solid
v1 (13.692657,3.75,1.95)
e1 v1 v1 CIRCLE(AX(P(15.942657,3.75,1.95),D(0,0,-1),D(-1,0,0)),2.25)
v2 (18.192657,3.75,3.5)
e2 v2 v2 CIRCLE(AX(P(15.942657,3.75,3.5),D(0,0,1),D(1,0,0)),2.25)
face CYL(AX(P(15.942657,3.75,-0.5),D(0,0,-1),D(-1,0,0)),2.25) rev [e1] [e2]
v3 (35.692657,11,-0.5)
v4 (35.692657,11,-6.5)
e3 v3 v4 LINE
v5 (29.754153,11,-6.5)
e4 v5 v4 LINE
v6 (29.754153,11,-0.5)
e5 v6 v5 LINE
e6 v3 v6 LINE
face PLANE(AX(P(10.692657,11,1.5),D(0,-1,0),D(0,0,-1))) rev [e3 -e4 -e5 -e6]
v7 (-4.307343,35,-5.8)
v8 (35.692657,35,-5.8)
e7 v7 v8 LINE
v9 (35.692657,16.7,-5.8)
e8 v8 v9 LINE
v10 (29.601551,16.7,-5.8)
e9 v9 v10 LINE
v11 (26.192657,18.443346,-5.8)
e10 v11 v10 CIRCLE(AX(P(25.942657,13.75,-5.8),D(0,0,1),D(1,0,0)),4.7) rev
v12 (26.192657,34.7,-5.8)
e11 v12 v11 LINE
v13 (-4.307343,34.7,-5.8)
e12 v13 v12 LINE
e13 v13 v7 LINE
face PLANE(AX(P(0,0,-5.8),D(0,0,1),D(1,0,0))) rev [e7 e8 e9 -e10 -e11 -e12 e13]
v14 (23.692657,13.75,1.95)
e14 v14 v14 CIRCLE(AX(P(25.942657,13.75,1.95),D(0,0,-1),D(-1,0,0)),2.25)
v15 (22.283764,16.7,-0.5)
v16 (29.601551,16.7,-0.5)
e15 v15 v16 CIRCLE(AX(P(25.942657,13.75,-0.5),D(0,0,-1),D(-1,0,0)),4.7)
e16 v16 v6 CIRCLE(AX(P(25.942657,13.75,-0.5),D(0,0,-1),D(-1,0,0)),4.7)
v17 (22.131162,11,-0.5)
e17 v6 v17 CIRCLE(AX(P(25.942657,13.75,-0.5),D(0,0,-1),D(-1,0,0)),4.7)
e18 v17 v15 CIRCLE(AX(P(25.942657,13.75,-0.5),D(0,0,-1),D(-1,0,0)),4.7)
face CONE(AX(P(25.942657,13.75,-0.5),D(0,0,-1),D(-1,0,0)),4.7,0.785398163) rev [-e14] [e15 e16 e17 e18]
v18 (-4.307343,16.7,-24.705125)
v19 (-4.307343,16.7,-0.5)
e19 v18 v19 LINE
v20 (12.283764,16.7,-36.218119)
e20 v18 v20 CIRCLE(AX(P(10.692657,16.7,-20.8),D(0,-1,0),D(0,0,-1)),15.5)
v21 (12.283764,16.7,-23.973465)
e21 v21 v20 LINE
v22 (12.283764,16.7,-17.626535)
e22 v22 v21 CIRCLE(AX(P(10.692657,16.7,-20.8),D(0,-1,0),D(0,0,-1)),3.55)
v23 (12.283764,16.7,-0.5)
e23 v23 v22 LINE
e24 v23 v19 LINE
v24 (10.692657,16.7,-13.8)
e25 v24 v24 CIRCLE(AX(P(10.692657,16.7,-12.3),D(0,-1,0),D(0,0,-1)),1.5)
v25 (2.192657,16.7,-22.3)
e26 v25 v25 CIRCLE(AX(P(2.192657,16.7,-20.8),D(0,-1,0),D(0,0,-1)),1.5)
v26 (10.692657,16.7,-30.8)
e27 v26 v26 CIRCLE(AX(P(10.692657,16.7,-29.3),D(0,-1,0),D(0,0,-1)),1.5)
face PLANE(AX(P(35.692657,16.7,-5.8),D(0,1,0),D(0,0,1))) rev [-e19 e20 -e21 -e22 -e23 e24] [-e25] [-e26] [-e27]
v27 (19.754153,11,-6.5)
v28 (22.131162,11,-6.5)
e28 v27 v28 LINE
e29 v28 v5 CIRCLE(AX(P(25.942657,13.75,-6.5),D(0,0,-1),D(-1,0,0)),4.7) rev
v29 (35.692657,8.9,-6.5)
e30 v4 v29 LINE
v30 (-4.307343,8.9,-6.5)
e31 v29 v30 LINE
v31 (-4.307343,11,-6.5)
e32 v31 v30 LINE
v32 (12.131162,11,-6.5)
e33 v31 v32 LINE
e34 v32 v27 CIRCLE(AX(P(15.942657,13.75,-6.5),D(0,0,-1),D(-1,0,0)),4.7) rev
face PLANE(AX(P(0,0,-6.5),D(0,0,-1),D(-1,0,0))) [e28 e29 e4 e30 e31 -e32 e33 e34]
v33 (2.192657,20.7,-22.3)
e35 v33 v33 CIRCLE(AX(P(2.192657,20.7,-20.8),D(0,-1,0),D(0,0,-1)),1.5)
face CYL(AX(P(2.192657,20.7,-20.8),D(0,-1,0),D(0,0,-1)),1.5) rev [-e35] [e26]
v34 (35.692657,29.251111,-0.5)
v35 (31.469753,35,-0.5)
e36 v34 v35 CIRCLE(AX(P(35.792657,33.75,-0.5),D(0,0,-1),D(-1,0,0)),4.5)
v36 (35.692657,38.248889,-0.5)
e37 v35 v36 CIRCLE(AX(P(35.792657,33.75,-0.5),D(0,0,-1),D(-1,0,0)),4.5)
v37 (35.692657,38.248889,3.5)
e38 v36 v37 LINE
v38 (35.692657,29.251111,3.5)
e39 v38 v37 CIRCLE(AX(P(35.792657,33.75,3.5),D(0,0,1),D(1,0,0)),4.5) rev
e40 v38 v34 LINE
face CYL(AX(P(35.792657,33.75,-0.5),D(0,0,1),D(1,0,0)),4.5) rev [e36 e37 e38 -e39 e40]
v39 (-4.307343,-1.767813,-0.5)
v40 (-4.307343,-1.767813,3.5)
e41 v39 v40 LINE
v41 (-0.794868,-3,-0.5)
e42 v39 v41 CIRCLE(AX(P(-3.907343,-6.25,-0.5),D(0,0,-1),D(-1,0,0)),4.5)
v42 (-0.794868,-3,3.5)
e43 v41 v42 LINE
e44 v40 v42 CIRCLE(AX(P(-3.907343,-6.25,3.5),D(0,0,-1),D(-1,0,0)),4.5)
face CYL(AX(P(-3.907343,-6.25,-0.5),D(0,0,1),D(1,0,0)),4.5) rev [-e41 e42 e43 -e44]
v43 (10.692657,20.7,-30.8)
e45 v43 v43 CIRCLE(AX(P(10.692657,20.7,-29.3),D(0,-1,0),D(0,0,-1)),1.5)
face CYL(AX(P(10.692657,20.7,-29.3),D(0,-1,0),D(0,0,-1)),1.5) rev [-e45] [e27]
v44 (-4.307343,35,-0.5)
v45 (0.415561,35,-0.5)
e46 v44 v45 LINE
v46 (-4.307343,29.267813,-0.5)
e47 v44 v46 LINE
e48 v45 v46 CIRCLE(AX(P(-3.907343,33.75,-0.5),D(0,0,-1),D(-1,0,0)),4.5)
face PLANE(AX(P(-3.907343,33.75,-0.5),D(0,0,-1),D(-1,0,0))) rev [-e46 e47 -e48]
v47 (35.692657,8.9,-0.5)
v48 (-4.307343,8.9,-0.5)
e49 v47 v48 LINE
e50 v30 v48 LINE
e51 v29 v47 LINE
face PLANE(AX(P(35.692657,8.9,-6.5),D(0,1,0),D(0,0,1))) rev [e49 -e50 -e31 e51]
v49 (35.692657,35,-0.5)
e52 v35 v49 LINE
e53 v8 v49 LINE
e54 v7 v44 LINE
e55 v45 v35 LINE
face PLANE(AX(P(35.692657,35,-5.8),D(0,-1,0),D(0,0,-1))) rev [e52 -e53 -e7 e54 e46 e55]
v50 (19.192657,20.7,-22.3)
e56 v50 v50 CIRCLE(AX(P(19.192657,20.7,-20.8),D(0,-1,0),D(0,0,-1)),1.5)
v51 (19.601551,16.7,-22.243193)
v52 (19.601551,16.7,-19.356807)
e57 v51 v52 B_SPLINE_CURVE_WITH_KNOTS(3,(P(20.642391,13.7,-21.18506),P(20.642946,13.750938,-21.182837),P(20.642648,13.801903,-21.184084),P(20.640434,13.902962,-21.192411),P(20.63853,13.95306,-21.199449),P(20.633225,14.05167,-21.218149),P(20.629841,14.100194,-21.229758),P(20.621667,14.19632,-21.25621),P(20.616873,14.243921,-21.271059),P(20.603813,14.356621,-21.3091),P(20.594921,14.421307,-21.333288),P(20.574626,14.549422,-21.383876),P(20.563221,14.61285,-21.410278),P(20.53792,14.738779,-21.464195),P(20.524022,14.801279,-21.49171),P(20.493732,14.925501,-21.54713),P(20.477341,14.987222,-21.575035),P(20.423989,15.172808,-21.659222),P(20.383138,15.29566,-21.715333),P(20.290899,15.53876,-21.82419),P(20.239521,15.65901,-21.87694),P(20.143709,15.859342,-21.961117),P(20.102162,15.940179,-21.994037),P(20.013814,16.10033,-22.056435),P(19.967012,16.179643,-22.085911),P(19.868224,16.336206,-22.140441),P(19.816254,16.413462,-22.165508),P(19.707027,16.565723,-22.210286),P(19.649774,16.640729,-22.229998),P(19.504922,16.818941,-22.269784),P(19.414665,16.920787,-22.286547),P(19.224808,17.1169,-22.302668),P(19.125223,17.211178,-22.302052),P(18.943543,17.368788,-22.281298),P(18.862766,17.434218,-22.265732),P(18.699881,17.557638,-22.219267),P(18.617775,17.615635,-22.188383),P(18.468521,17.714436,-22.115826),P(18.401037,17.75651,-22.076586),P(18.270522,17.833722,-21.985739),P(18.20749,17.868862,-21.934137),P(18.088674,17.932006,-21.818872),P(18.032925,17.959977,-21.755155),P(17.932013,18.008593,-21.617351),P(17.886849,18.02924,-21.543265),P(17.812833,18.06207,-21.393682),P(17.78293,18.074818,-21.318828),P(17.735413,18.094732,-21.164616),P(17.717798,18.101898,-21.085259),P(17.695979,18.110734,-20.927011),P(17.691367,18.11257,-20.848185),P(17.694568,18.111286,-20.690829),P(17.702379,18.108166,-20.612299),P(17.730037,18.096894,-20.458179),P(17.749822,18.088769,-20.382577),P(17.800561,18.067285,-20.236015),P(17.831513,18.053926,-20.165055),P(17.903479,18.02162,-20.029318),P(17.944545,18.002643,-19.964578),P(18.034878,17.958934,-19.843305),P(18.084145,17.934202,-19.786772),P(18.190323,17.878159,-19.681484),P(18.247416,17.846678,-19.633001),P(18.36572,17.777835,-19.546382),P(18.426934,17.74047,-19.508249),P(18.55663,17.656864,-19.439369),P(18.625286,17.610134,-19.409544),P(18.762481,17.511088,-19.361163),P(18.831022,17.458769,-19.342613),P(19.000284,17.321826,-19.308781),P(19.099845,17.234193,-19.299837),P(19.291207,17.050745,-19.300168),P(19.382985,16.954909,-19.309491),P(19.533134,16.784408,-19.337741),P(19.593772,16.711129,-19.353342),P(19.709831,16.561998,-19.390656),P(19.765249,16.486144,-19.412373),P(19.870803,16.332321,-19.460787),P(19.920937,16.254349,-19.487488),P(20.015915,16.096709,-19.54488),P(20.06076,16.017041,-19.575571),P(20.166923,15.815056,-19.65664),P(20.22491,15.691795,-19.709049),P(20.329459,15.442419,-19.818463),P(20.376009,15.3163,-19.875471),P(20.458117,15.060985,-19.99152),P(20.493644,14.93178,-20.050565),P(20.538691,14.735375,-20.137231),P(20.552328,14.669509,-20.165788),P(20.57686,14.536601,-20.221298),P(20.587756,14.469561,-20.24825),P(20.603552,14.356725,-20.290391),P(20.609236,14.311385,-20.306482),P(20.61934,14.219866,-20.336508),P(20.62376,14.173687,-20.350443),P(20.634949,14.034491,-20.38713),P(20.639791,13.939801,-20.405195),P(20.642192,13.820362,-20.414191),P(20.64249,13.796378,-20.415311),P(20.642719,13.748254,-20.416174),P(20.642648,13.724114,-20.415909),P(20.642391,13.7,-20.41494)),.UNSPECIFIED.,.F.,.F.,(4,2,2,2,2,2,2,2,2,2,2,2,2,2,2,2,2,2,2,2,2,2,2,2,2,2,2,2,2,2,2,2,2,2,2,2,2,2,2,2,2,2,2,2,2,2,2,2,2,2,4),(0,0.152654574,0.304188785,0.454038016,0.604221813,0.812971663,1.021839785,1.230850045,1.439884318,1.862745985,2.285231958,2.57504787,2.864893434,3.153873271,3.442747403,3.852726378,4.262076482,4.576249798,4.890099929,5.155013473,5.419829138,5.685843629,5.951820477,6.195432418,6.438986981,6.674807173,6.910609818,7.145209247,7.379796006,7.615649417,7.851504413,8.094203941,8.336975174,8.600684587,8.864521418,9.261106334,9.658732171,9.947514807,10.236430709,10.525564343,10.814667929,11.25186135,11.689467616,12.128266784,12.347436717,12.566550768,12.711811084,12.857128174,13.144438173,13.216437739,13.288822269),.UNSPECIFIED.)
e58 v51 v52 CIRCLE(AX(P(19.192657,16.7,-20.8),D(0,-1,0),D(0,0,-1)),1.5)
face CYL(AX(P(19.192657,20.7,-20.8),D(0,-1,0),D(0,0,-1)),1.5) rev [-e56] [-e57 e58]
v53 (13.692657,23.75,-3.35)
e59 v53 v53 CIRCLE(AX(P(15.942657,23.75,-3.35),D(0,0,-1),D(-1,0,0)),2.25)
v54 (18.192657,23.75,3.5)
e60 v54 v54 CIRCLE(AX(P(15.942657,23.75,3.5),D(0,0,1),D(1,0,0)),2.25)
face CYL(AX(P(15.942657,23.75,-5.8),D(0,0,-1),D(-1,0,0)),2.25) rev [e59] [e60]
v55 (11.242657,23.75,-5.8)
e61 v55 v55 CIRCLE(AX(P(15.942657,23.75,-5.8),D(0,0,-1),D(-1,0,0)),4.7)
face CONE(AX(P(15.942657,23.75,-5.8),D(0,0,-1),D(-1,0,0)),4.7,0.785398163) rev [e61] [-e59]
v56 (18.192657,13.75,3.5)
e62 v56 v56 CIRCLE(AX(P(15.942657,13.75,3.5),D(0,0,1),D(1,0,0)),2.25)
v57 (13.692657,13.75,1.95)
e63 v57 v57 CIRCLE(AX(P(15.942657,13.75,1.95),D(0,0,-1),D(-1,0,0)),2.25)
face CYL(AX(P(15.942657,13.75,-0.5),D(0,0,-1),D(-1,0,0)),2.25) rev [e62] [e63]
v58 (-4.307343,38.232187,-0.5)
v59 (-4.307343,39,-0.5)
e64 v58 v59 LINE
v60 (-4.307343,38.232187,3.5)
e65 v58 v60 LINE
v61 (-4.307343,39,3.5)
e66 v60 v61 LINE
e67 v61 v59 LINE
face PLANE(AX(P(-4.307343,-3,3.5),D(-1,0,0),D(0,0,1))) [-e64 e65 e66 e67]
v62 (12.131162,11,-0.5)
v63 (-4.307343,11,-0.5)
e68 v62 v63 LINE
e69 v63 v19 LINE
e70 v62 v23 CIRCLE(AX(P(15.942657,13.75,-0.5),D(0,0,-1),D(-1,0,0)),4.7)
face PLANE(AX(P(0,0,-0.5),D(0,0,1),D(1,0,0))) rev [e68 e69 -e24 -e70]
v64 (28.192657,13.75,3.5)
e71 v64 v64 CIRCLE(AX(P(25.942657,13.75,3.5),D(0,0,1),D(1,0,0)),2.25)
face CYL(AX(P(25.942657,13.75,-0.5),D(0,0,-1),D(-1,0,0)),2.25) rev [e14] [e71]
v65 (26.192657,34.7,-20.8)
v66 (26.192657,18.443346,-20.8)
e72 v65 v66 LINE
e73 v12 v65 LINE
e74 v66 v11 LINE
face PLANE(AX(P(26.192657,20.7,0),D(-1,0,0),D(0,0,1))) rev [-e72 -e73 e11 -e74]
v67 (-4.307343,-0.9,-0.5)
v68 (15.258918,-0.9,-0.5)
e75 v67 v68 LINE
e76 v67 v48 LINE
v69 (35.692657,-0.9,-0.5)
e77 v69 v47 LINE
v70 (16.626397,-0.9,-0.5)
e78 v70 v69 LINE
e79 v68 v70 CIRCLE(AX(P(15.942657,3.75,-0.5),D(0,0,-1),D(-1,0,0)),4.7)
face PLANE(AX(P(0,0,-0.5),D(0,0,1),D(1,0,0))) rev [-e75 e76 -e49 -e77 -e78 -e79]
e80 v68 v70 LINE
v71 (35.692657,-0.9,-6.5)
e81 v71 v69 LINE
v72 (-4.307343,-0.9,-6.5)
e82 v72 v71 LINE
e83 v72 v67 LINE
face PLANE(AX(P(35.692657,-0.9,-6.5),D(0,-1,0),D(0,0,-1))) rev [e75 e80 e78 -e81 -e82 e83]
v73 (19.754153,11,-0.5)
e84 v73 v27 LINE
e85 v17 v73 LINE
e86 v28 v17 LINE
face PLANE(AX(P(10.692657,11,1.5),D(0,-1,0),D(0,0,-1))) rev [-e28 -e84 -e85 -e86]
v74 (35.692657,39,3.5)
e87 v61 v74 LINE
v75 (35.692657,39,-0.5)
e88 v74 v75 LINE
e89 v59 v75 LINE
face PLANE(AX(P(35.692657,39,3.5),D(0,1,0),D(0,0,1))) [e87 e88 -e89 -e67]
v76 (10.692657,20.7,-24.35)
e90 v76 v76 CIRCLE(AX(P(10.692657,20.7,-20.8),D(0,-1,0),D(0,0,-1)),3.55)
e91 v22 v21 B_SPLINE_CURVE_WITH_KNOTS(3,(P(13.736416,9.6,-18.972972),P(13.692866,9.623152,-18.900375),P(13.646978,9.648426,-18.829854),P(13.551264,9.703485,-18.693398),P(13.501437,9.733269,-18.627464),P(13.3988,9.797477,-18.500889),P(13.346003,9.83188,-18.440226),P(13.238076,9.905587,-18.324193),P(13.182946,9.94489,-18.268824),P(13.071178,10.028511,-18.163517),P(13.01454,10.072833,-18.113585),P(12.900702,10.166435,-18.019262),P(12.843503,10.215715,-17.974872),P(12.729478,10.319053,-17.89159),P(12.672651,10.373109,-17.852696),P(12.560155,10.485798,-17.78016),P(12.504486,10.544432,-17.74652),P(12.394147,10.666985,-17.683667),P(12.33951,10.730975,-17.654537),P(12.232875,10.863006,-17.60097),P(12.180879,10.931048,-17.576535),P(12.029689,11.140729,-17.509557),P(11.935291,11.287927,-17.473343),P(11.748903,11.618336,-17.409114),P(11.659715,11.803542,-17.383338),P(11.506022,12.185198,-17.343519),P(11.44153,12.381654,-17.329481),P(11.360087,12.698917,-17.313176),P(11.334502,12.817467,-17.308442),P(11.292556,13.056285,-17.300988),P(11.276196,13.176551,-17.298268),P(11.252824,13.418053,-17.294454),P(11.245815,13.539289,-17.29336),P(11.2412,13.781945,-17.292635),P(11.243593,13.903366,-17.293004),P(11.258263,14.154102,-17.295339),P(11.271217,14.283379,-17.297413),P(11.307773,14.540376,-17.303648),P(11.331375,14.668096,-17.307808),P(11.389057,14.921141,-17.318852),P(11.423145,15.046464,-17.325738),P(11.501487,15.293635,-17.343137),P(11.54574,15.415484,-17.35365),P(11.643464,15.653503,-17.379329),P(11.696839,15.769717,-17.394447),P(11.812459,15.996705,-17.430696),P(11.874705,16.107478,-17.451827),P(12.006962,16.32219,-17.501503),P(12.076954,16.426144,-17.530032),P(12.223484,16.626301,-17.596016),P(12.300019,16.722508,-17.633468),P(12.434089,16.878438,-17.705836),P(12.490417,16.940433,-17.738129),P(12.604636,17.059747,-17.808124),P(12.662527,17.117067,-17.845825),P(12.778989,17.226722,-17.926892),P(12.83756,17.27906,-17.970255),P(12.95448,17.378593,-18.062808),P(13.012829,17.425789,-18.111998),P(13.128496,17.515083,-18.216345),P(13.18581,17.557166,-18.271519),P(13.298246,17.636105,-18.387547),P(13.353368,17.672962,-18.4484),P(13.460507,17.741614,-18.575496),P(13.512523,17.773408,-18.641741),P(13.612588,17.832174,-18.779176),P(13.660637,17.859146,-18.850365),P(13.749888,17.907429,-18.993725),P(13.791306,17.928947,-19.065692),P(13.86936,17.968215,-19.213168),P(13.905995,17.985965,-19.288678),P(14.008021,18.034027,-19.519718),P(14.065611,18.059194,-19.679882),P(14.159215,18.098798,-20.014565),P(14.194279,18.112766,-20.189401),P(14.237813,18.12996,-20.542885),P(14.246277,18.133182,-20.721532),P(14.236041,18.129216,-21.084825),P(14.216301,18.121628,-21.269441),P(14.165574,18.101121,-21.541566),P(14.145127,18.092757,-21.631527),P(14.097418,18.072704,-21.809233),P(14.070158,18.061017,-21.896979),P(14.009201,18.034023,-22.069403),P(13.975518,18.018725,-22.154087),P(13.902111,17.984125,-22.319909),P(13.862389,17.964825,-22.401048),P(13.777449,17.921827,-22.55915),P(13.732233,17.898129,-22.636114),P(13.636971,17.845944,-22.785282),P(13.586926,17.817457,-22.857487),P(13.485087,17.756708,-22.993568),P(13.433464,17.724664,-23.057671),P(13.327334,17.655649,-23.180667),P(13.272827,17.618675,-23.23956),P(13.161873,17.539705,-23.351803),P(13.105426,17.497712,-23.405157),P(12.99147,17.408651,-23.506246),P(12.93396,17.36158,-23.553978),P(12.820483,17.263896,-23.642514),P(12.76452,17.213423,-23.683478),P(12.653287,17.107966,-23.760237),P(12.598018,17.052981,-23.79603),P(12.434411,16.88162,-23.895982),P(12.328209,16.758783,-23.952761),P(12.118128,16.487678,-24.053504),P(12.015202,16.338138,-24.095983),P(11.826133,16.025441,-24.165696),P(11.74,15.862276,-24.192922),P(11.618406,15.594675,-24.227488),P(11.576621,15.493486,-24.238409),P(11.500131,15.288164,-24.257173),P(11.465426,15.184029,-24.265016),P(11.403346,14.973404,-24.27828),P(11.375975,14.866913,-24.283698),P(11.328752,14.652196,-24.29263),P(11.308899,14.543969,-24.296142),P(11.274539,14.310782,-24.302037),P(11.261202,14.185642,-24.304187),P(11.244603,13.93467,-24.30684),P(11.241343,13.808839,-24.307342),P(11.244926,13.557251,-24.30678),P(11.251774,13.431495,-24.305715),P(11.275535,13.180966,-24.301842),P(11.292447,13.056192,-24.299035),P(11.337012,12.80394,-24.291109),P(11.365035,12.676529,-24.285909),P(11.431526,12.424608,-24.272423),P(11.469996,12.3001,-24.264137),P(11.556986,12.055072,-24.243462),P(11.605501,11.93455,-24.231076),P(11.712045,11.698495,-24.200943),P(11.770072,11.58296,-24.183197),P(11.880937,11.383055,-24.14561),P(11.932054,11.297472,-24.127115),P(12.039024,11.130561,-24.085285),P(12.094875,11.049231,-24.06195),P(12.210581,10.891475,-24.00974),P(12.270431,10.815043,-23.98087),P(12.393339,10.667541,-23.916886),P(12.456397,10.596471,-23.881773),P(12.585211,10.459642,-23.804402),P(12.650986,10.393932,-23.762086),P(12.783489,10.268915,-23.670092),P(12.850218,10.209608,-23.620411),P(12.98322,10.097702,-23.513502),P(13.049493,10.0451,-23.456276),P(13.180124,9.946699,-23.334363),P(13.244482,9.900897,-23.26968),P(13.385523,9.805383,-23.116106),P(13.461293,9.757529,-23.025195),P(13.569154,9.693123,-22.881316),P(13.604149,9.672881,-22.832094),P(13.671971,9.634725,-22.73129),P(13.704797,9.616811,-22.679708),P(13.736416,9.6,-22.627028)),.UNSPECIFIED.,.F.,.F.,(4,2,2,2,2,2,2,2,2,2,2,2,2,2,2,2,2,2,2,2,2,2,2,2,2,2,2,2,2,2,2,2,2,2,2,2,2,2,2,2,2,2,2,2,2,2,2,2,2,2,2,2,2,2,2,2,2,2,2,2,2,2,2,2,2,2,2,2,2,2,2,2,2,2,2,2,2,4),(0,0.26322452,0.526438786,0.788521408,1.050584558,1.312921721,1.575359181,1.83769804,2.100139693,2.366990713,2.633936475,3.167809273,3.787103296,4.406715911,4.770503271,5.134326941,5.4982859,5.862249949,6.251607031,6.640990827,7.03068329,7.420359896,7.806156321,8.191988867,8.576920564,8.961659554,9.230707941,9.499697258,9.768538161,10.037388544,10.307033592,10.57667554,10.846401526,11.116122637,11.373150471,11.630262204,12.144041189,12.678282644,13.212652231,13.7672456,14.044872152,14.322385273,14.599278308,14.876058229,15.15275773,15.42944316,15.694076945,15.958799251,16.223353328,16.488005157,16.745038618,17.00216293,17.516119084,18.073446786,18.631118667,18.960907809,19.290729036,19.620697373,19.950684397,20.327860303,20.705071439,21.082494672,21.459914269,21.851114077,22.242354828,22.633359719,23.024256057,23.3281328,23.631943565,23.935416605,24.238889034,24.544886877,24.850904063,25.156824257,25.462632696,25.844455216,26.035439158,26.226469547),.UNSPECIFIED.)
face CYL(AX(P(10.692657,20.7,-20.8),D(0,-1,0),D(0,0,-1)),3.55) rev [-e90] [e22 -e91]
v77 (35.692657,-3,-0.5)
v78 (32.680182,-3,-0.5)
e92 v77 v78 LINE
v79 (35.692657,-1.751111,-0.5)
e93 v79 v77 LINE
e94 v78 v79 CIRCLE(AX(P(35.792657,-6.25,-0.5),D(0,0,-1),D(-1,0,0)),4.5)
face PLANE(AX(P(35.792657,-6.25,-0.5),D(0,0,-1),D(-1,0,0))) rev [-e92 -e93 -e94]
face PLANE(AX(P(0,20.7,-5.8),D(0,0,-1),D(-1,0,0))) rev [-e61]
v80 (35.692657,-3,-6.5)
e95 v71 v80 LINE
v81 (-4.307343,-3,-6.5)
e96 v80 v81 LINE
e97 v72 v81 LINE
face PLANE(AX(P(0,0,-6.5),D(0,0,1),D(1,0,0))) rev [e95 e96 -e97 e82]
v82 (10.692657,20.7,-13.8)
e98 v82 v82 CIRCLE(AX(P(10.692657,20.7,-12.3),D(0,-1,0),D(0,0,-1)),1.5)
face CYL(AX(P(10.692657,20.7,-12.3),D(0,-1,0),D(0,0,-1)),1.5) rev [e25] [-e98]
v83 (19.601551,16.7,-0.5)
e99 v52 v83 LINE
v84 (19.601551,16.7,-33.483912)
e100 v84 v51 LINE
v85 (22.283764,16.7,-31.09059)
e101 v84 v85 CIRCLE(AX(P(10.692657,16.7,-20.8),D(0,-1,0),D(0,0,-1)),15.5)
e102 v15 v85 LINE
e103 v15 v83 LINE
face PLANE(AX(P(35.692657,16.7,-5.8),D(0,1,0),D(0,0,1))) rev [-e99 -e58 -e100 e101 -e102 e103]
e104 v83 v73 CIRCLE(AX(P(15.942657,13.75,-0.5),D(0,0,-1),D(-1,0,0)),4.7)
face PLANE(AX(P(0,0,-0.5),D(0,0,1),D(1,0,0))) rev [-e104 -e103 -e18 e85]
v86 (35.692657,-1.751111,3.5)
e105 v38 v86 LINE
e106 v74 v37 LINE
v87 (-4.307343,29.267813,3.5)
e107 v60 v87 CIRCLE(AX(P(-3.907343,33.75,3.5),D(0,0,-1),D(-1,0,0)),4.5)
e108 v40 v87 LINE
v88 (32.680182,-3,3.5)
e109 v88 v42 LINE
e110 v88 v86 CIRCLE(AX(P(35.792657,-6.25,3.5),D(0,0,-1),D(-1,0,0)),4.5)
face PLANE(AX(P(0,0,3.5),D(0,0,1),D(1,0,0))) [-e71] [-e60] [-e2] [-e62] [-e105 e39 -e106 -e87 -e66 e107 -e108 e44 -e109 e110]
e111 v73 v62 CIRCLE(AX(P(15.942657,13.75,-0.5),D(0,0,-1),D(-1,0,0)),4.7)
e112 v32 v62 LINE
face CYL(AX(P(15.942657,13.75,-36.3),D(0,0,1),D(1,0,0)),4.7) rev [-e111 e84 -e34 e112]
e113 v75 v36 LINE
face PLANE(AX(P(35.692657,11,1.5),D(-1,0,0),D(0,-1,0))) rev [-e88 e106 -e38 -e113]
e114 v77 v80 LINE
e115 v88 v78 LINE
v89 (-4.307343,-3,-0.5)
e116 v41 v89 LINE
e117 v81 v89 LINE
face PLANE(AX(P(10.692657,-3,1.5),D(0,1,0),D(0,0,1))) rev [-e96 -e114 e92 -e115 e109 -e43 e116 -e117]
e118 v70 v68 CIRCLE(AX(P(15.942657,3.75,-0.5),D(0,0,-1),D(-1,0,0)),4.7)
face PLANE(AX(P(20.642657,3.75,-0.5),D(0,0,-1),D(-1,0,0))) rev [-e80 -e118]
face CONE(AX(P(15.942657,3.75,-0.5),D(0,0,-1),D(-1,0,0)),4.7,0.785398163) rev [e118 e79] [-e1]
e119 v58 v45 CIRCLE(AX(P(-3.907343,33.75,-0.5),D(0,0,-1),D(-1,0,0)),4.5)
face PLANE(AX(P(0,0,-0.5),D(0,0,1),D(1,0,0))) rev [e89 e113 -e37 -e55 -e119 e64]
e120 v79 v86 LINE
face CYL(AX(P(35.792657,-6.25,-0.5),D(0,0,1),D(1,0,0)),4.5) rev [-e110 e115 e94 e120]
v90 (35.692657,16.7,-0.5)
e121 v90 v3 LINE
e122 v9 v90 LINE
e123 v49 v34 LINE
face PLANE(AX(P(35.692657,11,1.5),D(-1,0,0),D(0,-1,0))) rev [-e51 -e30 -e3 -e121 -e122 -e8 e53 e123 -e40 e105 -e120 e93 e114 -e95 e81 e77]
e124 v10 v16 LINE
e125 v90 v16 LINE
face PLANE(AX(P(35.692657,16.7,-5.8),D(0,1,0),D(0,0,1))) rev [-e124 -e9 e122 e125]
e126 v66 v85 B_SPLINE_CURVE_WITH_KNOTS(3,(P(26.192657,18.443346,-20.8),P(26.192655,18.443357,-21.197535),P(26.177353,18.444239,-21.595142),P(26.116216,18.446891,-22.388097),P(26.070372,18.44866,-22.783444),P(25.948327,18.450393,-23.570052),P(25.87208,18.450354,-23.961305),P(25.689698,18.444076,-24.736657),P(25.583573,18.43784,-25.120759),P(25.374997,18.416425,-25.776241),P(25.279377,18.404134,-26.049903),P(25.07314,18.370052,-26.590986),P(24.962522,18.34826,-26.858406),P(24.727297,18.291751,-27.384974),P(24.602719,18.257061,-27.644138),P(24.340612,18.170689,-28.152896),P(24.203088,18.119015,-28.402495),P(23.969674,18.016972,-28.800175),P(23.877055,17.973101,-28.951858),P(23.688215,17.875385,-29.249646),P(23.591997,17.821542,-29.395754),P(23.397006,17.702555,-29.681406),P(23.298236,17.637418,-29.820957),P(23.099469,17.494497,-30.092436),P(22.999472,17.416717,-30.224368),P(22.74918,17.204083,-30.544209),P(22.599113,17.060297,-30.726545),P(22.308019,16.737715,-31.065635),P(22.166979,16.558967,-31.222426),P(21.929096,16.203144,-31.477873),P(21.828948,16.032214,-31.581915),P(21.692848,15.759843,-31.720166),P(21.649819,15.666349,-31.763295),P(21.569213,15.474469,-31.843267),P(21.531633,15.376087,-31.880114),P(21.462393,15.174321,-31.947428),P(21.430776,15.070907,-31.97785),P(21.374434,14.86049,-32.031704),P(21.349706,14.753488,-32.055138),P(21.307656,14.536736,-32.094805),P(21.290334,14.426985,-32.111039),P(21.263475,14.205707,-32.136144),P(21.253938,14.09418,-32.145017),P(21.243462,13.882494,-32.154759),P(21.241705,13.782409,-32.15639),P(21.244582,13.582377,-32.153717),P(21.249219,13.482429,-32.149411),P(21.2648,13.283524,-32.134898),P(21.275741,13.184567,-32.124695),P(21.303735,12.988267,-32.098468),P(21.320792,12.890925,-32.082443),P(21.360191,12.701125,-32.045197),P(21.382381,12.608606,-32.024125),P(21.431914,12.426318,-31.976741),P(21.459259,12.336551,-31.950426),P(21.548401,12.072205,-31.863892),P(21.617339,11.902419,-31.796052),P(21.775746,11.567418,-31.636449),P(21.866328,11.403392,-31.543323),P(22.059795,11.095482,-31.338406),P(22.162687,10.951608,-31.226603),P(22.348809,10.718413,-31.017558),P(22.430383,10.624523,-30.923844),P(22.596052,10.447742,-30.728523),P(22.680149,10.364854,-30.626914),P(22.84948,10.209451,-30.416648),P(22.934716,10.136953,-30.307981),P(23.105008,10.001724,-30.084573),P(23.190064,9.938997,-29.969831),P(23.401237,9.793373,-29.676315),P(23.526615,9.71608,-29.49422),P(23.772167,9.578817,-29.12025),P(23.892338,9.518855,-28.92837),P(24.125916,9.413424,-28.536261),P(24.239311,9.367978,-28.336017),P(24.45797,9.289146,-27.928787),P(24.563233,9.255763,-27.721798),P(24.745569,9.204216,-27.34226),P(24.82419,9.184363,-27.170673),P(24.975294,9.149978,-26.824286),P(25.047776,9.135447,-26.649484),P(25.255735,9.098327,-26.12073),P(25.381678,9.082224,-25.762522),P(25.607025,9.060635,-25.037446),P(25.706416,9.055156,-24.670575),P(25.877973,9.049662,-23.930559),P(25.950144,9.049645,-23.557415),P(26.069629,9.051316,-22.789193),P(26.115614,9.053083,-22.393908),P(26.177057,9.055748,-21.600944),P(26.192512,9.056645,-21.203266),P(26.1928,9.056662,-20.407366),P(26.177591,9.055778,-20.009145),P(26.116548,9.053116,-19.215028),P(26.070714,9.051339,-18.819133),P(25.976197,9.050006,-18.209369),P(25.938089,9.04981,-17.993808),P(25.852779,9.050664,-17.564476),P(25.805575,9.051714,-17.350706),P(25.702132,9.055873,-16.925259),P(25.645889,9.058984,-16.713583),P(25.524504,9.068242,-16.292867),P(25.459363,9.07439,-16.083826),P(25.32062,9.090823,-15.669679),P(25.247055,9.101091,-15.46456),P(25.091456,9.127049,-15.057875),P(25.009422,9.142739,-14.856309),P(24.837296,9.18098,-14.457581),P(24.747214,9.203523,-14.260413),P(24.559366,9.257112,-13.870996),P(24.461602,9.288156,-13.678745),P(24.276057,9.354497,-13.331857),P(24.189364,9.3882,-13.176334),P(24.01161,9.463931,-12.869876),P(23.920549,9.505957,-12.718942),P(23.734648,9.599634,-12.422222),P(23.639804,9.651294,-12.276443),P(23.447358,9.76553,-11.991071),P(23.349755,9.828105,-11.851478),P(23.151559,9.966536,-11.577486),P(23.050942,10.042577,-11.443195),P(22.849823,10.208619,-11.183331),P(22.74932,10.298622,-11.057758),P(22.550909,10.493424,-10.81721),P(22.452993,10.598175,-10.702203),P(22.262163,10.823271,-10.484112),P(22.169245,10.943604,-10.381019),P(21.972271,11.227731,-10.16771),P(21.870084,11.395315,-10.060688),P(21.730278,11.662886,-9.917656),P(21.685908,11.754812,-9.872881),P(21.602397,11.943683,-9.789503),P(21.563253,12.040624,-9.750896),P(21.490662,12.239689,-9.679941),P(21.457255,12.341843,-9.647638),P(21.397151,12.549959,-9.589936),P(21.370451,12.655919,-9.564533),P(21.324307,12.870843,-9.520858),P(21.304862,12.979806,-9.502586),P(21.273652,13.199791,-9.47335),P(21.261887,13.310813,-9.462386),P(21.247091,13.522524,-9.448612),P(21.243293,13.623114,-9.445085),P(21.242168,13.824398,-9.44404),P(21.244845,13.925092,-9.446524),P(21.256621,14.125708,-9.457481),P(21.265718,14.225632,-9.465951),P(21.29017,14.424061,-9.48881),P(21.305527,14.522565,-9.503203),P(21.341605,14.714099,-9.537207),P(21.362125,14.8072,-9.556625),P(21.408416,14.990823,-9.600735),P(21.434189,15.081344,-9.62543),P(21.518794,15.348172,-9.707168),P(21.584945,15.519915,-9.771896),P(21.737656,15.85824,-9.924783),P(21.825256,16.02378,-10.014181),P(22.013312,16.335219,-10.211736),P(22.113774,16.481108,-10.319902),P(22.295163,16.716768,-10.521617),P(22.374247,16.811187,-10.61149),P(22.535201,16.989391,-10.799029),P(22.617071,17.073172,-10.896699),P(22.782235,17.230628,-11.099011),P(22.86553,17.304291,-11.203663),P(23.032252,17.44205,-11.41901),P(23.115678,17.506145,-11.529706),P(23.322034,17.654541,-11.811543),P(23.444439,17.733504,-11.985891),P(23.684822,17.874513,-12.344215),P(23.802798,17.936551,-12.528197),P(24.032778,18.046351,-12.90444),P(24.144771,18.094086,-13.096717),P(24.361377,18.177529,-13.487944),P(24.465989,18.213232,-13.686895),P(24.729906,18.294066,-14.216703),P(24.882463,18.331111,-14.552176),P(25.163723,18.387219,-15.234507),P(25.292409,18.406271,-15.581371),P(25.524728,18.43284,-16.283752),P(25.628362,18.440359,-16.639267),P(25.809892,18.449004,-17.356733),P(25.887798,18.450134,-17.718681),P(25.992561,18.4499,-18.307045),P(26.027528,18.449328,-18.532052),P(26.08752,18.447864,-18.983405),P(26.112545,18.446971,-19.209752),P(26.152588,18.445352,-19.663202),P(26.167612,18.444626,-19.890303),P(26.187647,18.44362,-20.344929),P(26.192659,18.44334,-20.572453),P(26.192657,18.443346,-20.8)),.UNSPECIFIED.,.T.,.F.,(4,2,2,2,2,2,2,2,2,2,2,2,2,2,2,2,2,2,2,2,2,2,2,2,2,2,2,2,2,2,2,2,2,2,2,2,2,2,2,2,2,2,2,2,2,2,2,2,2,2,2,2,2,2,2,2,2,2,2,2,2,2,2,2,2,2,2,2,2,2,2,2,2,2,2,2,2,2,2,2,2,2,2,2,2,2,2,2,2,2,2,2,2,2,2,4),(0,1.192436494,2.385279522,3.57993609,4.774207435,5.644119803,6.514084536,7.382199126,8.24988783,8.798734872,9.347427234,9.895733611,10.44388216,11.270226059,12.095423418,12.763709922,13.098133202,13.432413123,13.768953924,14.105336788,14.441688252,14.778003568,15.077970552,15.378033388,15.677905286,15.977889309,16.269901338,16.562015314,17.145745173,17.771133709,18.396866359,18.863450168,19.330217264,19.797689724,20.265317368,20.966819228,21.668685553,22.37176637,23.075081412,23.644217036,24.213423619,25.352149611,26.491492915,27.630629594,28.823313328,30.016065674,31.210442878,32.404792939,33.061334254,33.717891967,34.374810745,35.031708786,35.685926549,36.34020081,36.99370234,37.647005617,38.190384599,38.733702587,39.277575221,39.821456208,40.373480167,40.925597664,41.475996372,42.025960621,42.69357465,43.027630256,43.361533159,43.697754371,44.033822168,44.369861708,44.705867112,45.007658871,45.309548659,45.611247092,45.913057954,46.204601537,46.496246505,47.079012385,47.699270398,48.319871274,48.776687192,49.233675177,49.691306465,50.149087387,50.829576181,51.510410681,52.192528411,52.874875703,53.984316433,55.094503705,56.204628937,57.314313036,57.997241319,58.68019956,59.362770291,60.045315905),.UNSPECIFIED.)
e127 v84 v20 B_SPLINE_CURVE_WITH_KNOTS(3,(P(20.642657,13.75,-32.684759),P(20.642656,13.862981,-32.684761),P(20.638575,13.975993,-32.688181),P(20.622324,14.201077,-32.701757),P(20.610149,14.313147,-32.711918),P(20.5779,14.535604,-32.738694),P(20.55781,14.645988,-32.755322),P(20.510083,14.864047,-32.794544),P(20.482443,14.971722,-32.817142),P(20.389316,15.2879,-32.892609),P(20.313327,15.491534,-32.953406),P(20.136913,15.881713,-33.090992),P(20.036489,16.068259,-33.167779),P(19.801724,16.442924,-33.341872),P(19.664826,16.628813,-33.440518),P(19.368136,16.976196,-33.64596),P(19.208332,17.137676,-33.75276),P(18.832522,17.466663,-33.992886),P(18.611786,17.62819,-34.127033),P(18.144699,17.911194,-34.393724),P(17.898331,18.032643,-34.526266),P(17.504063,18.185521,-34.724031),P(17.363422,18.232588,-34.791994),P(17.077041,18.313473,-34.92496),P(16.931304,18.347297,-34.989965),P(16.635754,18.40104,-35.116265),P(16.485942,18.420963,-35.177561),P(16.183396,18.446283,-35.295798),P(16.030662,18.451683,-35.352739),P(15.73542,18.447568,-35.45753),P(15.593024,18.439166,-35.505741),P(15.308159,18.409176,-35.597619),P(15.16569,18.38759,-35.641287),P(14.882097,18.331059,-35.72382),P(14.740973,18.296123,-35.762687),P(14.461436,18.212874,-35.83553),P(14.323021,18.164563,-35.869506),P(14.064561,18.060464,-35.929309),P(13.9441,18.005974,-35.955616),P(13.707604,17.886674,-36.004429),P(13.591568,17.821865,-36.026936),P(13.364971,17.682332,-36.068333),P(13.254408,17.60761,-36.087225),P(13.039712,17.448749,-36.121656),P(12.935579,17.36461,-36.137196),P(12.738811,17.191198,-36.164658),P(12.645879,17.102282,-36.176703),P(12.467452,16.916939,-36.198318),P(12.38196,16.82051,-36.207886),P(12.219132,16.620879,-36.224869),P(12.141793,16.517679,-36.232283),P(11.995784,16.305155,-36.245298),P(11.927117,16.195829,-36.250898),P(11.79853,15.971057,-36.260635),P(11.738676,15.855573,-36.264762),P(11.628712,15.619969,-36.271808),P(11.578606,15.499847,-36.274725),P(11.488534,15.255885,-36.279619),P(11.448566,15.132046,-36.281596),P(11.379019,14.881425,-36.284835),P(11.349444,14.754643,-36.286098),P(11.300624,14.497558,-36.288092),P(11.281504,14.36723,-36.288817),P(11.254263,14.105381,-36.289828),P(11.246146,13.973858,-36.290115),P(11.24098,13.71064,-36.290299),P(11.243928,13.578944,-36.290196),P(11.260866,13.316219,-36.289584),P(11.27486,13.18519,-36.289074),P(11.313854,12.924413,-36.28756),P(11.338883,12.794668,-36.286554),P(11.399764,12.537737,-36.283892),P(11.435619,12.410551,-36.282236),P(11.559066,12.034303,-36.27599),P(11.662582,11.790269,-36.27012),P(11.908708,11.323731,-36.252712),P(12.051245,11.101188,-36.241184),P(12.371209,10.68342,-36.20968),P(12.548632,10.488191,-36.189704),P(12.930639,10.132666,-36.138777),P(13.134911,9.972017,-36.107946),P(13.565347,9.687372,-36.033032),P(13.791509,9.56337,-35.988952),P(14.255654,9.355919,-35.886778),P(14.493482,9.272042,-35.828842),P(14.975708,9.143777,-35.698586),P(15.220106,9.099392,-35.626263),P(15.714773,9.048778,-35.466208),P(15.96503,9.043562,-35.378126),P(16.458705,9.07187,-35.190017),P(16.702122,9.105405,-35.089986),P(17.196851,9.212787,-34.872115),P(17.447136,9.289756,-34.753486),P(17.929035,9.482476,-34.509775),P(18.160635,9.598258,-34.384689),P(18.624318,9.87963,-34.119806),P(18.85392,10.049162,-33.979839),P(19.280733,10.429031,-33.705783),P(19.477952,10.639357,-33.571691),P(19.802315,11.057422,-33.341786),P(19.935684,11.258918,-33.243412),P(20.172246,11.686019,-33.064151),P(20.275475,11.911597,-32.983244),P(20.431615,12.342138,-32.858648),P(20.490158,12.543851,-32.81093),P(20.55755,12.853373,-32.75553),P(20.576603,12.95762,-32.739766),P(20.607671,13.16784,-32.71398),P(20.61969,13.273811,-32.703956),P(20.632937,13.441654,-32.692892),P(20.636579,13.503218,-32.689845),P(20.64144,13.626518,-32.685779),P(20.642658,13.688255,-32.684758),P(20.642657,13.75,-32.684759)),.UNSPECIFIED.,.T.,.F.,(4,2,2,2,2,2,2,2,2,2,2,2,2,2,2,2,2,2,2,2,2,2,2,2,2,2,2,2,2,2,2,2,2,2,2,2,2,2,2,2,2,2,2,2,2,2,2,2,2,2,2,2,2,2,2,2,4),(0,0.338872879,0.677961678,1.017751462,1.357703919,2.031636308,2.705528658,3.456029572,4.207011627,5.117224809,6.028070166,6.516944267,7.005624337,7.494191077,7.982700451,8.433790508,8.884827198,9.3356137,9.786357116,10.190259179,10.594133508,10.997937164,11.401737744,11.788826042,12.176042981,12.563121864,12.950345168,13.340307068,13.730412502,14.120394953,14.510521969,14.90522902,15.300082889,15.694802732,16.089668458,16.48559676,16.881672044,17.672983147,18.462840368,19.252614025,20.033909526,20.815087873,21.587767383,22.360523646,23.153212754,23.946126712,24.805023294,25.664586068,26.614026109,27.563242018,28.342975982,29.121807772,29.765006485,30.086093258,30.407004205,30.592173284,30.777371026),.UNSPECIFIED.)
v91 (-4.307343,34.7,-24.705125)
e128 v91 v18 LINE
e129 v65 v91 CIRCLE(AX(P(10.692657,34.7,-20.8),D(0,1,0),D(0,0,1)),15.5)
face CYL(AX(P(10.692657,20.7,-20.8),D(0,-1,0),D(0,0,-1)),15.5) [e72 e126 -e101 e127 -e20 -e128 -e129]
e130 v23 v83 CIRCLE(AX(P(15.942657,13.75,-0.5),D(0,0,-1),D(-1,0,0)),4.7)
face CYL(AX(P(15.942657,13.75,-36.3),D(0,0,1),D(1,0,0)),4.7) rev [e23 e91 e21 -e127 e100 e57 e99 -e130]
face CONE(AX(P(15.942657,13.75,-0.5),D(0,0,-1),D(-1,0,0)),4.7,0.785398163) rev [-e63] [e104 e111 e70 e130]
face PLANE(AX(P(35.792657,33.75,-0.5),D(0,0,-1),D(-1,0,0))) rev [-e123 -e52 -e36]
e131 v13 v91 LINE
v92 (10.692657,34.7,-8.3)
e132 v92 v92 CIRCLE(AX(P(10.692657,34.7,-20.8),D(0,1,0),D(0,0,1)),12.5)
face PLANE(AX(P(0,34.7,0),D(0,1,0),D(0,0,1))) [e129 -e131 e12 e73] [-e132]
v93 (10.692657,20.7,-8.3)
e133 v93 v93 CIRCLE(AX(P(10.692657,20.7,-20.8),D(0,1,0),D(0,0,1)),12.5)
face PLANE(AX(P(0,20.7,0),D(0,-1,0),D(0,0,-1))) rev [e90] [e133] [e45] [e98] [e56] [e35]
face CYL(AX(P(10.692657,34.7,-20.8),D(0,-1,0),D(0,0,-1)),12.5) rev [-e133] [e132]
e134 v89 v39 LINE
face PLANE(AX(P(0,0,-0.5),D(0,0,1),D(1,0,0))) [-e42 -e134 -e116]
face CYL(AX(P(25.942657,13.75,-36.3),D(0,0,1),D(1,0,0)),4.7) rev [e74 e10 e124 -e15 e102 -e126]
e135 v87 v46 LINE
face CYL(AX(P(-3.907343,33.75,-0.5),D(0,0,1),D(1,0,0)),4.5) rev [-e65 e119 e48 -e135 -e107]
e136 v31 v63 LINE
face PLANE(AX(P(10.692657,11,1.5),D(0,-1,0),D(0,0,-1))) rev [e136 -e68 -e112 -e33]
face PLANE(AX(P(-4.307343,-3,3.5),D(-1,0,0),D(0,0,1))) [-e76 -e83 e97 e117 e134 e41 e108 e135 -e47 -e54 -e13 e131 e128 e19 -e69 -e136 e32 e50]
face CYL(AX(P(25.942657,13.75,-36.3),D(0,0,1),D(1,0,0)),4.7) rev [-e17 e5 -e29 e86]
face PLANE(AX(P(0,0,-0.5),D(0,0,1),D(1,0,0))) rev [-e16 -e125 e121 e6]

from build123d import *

# Parameters (mm, degrees)
BOSS_EXTRUDE1_START = 0.5
SKETCH1_W           = 25
SKETCH1_H           = 14
BOSS_EXTRUDE1_DEPTH = 2
SKETCH2_W           = 25
SKETCH2_H           = 2.1
BOSS_EXTRUDE2_DEPTH = 6
SKETCH3_W           = 40
SKETCH3_H           = 42
BOSS_EXTRUDE3_DEPTH = 4
BOSS_EXTRUDE5_START = -18.3
SKETCH4_2_R         = 1.5
BOSS_EXTRUDE5_DEPTH = 4
SKETCH5_W           = 40
SKETCH5_H           = 18.3
BOSS_EXTRUDE6_DEPTH = 5.3
SKETCH7_R           = 4.5
CUT_EXTRUDE1_DEPTH  = 4
SKETCH9_W           = 35.343646405
SKETCH9_H           = 8.813303651
CUT_EXTRUDE3_DEPTH  = 10
SKETCH11_R          = 12.5
SKETCH11_R_2        = 1.5
SKETCH11_R_3        = 3.55
BOSS_EXTRUDE7_DEPTH = 4
SKETCH12_R          = 12.5
BOSS_EXTRUDE8_DEPTH = 14
SKETCH13_W          = 15
SKETCH13_H          = 2.1
BOSS_EXTRUDE9_DEPTH = 6
CUT_EXTRUDE2_DEPTH  = 64.84830294
SKETCH14_W          = 6.01632357
SKETCH14_H          = 22.957747356
CUT_EXTRUDE4_DEPTH  = 64.347816028


# Read off the part's stored shape, not the designer's step: CSK for M4 Flat Head Machine Screw1
with BuildPart() as part:
    # Sketch1 → Boss-Extrude1 (new body)
    with BuildSketch(Plane.XY.offset(-1).offset(BOSS_EXTRUDE1_START)):
        with Locations((23.192657344, 4)):
            Rectangle(SKETCH1_W, SKETCH1_H)
    extrude(amount=BOSS_EXTRUDE1_DEPTH)

    # Sketch2 → Boss-Extrude2 (add)
    with BuildSketch(Plane(origin=(0, 0, -0.5), x_dir=(-1, 0, 0), z_dir=(0, 0, -1))):
        with Locations((-23.192657344, 9.95)):
            Rectangle(SKETCH2_W, SKETCH2_H)
        with Locations((-23.192657344, -1.95)):
            Rectangle(SKETCH2_W, SKETCH2_H)
    extrude(amount=BOSS_EXTRUDE2_DEPTH)

    # Sketch3 → Boss-Extrude3 (add)
    with BuildSketch(Plane(origin=(0, 0, -0.5), x_dir=(-1, 0, 0), z_dir=(0, 0, -1))):
        with Locations((-15.692657344, 18)):
            Rectangle(SKETCH3_W, SKETCH3_H)
    extrude(amount=-BOSS_EXTRUDE3_DEPTH)

    # Sketch4<2> → Boss-Extrude5 (add)
    with BuildSketch(Plane(origin=(0, 35, 0), x_dir=(1, 0, 0), z_dir=(0, 1, 0)).offset(BOSS_EXTRUDE5_START)):
        with BuildLine():
            Line((-1.349302764, 24.5), (-1.349302764, 0.5))
            Line((-1.349302764, 0.5), (8.650697236, 0.5))
            Line((8.650697236, 0.5), (8.650697236, 24.5))
            ThreePointArc((8.650697236, 24.5), (3.650697236, 29.5), (-1.349302764, 24.5))
        make_face()
        with Locations(Location((3.650697236, 7.5, 0), (0, 0, 270))):
            Circle(SKETCH4_2_R, mode=Mode.SUBTRACT)
        with Locations(Location((3.650697236, 24.5, 0), (0, 0, 270))):
            Circle(SKETCH4_2_R, mode=Mode.SUBTRACT)
    extrude(amount=-BOSS_EXTRUDE5_DEPTH)

    # Sketch5 → Boss-Extrude6 (add)
    with BuildSketch(Plane(origin=(0, 0, -0.5), x_dir=(-1, 0, 0), z_dir=(0, 0, -1))):
        with Locations((-15.692657344, 25.85)):
            Rectangle(SKETCH5_W, SKETCH5_H)
    extrude(amount=BOSS_EXTRUDE6_DEPTH)

    # CSK for M4 Flat Head Machine Screw1 outl → CSK for M4 Flat Head Machine Screw1 (revolve, cut)
    with BuildSketch(Plane(origin=(15.942657344, 23.75, 0), x_dir=(1, 0, 0), z_dir=(0, -1, 0))):
        Polygon((2.25, -3.35), (2.25, 3.5), (0, 3.5), (0, -5.8), (4.7, -5.8), align=None)
    revolve(axis=Axis((15.942657344, 23.75, 0), (0, 0, 1)), mode=Mode.SUBTRACT)

    # CSK for M4 Flat Head Machine Screw1 2 ou → CSK for M4 Flat Head Machine Screw1 2 (revolve, cut)
    with BuildSketch(Plane(origin=(15.942657344, 3.75, 0), x_dir=(1, 0, 0), z_dir=(0, -1, 0))):
        Polygon((4.7, -0.5), (2.25, 1.95), (2.25, 3.5), (0, 3.5), (0, -0.5), align=None)
    revolve(axis=Axis((15.942657344, 3.75, 0), (0, 0, 1)), mode=Mode.SUBTRACT)

    # CSK for M4 Flat Head Machine Screw1 3 ou → CSK for M4 Flat Head Machine Screw1 3 (revolve, cut)
    with BuildSketch(Plane(origin=(15.942657344, 13.75, 0), x_dir=(1, 0, 0), z_dir=(0, -1, 0))):
        Polygon((4.7, -0.5), (2.25, 1.95), (2.25, 3.5), (0, 3.5), (0, -0.5), align=None)
    revolve(axis=Axis((15.942657344, 13.75, 0), (0, 0, 1)), mode=Mode.SUBTRACT)

    # CSK for M4 Flat Head Machine Screw1 4 ou → CSK for M4 Flat Head Machine Screw1 4 (revolve, cut)
    with BuildSketch(Plane(origin=(25.942657344, 13.75, 0), x_dir=(1, 0, 0), z_dir=(0, -1, 0))):
        Polygon((2.25, 1.95), (2.25, 3.5), (0, 3.5), (0, -0.5), (4.7, -0.5), align=None)
    revolve(axis=Axis((25.942657344, 13.75, 0), (0, 0, 1)), mode=Mode.SUBTRACT)

    # Sketch7 → Cut-Extrude1 (cut)
    with BuildSketch(Plane(origin=(0, 0, 3.5), x_dir=(-1, 0, 0), z_dir=(0, 0, -1))):
        with Locations((-35.792657344, 33.75)):
            Circle(SKETCH7_R)
        with Locations((3.907342656, 33.75)):
            Circle(SKETCH7_R)
        with Locations((3.907342656, -6.25)):
            Circle(SKETCH7_R)
        with Locations((-35.792657344, -6.25)):
            Circle(SKETCH7_R)
    extrude(amount=CUT_EXTRUDE1_DEPTH, mode=Mode.SUBTRACT)

    # Sketch9 → Cut-Extrude3 (cut)
    with BuildSketch(Plane.ZY.offset(1.349302764)):
        with Locations((-18.171823203, 12.293348175)):
            Rectangle(SKETCH9_W, SKETCH9_H)
    extrude(amount=-CUT_EXTRUDE3_DEPTH, mode=Mode.SUBTRACT)

    # Sketch11 → Boss-Extrude7 (add)
    # profile 1 of 4: a face of its own
    with BuildSketch(Plane.XZ.offset(-16.7)):
        with BuildLine():
            Line((6.787532506, -5.8), (-4.307342656, -5.8))
            Line((-4.307342656, -5.8), (-4.807342656, -5.8))
            Line((-4.807342656, -5.8), (-4.807342656, -20.8))
            ThreePointArc((-4.807342656, -20.8), (-1.570691199, -11.320533638), (6.787532506, -5.8))
        make_face()
    # profile 2 of 4: a face of its own
    with BuildSketch(Plane.XZ.offset(-16.7)):
        with BuildLine():
            Line((14.597782182, -5.8), (6.787532506, -5.8))
            ThreePointArc((6.787532506, -5.8), (-1.570691199, -11.320533638), (-4.807342656, -20.8))
            ThreePointArc((-4.807342656, -20.8), (10.692657344, -36.3), (26.192657344, -20.8))
            ThreePointArc((26.192657344, -20.8), (22.956005887, -11.320533638), (14.597782182, -5.8))
        make_face()
        with Locations((10.692657344, -20.8)):
            Circle(SKETCH11_R, mode=Mode.SUBTRACT)
    # profile 3 of 4: a face of its own
    with BuildSketch(Plane.XZ.offset(-16.7)):
        with Locations((10.692657344, -20.8)):
            Circle(SKETCH11_R)
        with Locations(Location((10.692657344, -12.3, 0), (0, 0, 270))):
            Circle(SKETCH11_R_2, mode=Mode.SUBTRACT)
        with Locations(Location((10.692657344, -20.8, 0), (0, 0, 270))):
            Circle(SKETCH11_R_3, mode=Mode.SUBTRACT)
        with Locations(Location((19.192657344, -20.8, 0), (0, 0, 270))):
            Circle(SKETCH11_R_2, mode=Mode.SUBTRACT)
        with Locations(Location((10.692657344, -29.3, 0), (0, 0, 270))):
            Circle(SKETCH11_R_2, mode=Mode.SUBTRACT)
        with Locations(Location((2.192657344, -20.8, 0), (0, 0, 270))):
            Circle(SKETCH11_R_2, mode=Mode.SUBTRACT)
    # profile 4 of 4: a face of its own
    with BuildSketch(Plane.XZ.offset(-16.7)):
        with BuildLine():
            Line((26.192657344, -5.8), (14.597782182, -5.8))
            ThreePointArc((14.597782182, -5.8), (22.956005887, -11.320533638), (26.192657344, -20.8))
            Line((26.192657344, -20.8), (26.192657344, -5.8))
        make_face()
    extrude(amount=-BOSS_EXTRUDE7_DEPTH)

    # Sketch12 → Boss-Extrude8 (add)
    # profile 1 of 3: a face of its own
    with BuildSketch(Plane(origin=(0, 20.7, 0), x_dir=(1, 0, 0), z_dir=(0, 1, 0))):
        with BuildLine():
            ThreePointArc((26.192657344, 20.8), (10.692657344, 36.3), (-4.807342656, 20.8))
            ThreePointArc((-4.807342656, 20.8), (-1.570691199, 11.320533638), (6.787532506, 5.8))
            Line((6.787532506, 5.8), (12.366695935, 5.8))
            Line((12.366695935, 5.8), (14.597782182, 5.8))
            ThreePointArc((14.597782182, 5.8), (22.956005887, 11.320533638), (26.192657344, 20.8))
        make_face()
        with Locations(Location((10.692657344, 20.8, 0), (0, 0, 270))):
            Circle(SKETCH12_R, mode=Mode.SUBTRACT)
    # profile 2 of 3: a face of its own
    with BuildSketch(Plane(origin=(0, 20.7, 0), x_dir=(1, 0, 0), z_dir=(0, 1, 0))):
        with BuildLine():
            Line((-4.807342656, 20.8), (-4.807342656, 5.8))
            Line((-4.807342656, 5.8), (-4.307342656, 5.8))
            Line((-4.307342656, 5.8), (6.787532506, 5.8))
            ThreePointArc((6.787532506, 5.8), (-1.570691199, 11.320533638), (-4.807342656, 20.8))
        make_face()
    # profile 3 of 3: a face of its own
    with BuildSketch(Plane(origin=(0, 20.7, 0), x_dir=(1, 0, 0), z_dir=(0, 1, 0))):
        with BuildLine():
            Line((26.192657344, 5.8), (26.192657344, 20.8))
            ThreePointArc((26.192657344, 20.8), (22.956005887, 11.320533638), (14.597782182, 5.8))
            Line((14.597782182, 5.8), (19.518618753, 5.8))
            Line((19.518618753, 5.8), (26.192657344, 5.8))
        make_face()
    extrude(amount=BOSS_EXTRUDE8_DEPTH)

    # Sketch13 → Boss-Extrude9 (add)
    with BuildSketch(Plane(origin=(0, 0, -0.5), x_dir=(-1, 0, 0), z_dir=(0, 0, -1))):
        with Locations((-3.192657344, 9.95)):
            Rectangle(SKETCH13_W, SKETCH13_H)
        with Locations((-3.192657344, -1.95)):
            Rectangle(SKETCH13_W, SKETCH13_H)
    extrude(amount=BOSS_EXTRUDE9_DEPTH)

    # Sketch8 → Cut-Extrude2 (cut, through all)
    with BuildSketch(Plane(origin=(0, 0, -0.5), x_dir=(-1, 0, 0), z_dir=(0, 0, -1))):
        with BuildLine():
            ThreePointArc((-12.283764069, 16.7), (-15.942657344, 18.45), (-19.601550619, 16.7))
            ThreePointArc((-19.601550619, 16.7), (-20.640973864, 13.875785056), (-19.754153113, 11))
            ThreePointArc((-19.754153113, 11), (-15.942657344, 9.05), (-12.131161575, 11))
            ThreePointArc((-12.131161575, 11), (-11.244340824, 13.875785056), (-12.283764069, 16.7))
        make_face()
        with BuildLine():
            ThreePointArc((-22.283764069, 16.7), (-25.942657344, 18.45), (-29.601550619, 16.7))
            ThreePointArc((-29.601550619, 16.7), (-30.640973864, 13.875785056), (-29.754153113, 11))
            ThreePointArc((-29.754153113, 11), (-25.942657344, 9.05), (-22.131161575, 11))
            ThreePointArc((-22.131161575, 11), (-21.244340824, 13.875785056), (-22.283764069, 16.7))
        make_face()
    extrude(amount=CUT_EXTRUDE2_DEPTH, mode=Mode.SUBTRACT)

    # Sketch14 → Cut-Extrude4 (cut, through all)
    with BuildSketch(Plane(origin=(0, 34.7, 0), x_dir=(1, 0, 0), z_dir=(0, 1, 0))):
        with Locations((-7.315504441, 17.278873678)):
            Rectangle(SKETCH14_W, SKETCH14_H)
    extrude(amount=-CUT_EXTRUDE4_DEPTH, mode=Mode.SUBTRACT)


solid = part.part
